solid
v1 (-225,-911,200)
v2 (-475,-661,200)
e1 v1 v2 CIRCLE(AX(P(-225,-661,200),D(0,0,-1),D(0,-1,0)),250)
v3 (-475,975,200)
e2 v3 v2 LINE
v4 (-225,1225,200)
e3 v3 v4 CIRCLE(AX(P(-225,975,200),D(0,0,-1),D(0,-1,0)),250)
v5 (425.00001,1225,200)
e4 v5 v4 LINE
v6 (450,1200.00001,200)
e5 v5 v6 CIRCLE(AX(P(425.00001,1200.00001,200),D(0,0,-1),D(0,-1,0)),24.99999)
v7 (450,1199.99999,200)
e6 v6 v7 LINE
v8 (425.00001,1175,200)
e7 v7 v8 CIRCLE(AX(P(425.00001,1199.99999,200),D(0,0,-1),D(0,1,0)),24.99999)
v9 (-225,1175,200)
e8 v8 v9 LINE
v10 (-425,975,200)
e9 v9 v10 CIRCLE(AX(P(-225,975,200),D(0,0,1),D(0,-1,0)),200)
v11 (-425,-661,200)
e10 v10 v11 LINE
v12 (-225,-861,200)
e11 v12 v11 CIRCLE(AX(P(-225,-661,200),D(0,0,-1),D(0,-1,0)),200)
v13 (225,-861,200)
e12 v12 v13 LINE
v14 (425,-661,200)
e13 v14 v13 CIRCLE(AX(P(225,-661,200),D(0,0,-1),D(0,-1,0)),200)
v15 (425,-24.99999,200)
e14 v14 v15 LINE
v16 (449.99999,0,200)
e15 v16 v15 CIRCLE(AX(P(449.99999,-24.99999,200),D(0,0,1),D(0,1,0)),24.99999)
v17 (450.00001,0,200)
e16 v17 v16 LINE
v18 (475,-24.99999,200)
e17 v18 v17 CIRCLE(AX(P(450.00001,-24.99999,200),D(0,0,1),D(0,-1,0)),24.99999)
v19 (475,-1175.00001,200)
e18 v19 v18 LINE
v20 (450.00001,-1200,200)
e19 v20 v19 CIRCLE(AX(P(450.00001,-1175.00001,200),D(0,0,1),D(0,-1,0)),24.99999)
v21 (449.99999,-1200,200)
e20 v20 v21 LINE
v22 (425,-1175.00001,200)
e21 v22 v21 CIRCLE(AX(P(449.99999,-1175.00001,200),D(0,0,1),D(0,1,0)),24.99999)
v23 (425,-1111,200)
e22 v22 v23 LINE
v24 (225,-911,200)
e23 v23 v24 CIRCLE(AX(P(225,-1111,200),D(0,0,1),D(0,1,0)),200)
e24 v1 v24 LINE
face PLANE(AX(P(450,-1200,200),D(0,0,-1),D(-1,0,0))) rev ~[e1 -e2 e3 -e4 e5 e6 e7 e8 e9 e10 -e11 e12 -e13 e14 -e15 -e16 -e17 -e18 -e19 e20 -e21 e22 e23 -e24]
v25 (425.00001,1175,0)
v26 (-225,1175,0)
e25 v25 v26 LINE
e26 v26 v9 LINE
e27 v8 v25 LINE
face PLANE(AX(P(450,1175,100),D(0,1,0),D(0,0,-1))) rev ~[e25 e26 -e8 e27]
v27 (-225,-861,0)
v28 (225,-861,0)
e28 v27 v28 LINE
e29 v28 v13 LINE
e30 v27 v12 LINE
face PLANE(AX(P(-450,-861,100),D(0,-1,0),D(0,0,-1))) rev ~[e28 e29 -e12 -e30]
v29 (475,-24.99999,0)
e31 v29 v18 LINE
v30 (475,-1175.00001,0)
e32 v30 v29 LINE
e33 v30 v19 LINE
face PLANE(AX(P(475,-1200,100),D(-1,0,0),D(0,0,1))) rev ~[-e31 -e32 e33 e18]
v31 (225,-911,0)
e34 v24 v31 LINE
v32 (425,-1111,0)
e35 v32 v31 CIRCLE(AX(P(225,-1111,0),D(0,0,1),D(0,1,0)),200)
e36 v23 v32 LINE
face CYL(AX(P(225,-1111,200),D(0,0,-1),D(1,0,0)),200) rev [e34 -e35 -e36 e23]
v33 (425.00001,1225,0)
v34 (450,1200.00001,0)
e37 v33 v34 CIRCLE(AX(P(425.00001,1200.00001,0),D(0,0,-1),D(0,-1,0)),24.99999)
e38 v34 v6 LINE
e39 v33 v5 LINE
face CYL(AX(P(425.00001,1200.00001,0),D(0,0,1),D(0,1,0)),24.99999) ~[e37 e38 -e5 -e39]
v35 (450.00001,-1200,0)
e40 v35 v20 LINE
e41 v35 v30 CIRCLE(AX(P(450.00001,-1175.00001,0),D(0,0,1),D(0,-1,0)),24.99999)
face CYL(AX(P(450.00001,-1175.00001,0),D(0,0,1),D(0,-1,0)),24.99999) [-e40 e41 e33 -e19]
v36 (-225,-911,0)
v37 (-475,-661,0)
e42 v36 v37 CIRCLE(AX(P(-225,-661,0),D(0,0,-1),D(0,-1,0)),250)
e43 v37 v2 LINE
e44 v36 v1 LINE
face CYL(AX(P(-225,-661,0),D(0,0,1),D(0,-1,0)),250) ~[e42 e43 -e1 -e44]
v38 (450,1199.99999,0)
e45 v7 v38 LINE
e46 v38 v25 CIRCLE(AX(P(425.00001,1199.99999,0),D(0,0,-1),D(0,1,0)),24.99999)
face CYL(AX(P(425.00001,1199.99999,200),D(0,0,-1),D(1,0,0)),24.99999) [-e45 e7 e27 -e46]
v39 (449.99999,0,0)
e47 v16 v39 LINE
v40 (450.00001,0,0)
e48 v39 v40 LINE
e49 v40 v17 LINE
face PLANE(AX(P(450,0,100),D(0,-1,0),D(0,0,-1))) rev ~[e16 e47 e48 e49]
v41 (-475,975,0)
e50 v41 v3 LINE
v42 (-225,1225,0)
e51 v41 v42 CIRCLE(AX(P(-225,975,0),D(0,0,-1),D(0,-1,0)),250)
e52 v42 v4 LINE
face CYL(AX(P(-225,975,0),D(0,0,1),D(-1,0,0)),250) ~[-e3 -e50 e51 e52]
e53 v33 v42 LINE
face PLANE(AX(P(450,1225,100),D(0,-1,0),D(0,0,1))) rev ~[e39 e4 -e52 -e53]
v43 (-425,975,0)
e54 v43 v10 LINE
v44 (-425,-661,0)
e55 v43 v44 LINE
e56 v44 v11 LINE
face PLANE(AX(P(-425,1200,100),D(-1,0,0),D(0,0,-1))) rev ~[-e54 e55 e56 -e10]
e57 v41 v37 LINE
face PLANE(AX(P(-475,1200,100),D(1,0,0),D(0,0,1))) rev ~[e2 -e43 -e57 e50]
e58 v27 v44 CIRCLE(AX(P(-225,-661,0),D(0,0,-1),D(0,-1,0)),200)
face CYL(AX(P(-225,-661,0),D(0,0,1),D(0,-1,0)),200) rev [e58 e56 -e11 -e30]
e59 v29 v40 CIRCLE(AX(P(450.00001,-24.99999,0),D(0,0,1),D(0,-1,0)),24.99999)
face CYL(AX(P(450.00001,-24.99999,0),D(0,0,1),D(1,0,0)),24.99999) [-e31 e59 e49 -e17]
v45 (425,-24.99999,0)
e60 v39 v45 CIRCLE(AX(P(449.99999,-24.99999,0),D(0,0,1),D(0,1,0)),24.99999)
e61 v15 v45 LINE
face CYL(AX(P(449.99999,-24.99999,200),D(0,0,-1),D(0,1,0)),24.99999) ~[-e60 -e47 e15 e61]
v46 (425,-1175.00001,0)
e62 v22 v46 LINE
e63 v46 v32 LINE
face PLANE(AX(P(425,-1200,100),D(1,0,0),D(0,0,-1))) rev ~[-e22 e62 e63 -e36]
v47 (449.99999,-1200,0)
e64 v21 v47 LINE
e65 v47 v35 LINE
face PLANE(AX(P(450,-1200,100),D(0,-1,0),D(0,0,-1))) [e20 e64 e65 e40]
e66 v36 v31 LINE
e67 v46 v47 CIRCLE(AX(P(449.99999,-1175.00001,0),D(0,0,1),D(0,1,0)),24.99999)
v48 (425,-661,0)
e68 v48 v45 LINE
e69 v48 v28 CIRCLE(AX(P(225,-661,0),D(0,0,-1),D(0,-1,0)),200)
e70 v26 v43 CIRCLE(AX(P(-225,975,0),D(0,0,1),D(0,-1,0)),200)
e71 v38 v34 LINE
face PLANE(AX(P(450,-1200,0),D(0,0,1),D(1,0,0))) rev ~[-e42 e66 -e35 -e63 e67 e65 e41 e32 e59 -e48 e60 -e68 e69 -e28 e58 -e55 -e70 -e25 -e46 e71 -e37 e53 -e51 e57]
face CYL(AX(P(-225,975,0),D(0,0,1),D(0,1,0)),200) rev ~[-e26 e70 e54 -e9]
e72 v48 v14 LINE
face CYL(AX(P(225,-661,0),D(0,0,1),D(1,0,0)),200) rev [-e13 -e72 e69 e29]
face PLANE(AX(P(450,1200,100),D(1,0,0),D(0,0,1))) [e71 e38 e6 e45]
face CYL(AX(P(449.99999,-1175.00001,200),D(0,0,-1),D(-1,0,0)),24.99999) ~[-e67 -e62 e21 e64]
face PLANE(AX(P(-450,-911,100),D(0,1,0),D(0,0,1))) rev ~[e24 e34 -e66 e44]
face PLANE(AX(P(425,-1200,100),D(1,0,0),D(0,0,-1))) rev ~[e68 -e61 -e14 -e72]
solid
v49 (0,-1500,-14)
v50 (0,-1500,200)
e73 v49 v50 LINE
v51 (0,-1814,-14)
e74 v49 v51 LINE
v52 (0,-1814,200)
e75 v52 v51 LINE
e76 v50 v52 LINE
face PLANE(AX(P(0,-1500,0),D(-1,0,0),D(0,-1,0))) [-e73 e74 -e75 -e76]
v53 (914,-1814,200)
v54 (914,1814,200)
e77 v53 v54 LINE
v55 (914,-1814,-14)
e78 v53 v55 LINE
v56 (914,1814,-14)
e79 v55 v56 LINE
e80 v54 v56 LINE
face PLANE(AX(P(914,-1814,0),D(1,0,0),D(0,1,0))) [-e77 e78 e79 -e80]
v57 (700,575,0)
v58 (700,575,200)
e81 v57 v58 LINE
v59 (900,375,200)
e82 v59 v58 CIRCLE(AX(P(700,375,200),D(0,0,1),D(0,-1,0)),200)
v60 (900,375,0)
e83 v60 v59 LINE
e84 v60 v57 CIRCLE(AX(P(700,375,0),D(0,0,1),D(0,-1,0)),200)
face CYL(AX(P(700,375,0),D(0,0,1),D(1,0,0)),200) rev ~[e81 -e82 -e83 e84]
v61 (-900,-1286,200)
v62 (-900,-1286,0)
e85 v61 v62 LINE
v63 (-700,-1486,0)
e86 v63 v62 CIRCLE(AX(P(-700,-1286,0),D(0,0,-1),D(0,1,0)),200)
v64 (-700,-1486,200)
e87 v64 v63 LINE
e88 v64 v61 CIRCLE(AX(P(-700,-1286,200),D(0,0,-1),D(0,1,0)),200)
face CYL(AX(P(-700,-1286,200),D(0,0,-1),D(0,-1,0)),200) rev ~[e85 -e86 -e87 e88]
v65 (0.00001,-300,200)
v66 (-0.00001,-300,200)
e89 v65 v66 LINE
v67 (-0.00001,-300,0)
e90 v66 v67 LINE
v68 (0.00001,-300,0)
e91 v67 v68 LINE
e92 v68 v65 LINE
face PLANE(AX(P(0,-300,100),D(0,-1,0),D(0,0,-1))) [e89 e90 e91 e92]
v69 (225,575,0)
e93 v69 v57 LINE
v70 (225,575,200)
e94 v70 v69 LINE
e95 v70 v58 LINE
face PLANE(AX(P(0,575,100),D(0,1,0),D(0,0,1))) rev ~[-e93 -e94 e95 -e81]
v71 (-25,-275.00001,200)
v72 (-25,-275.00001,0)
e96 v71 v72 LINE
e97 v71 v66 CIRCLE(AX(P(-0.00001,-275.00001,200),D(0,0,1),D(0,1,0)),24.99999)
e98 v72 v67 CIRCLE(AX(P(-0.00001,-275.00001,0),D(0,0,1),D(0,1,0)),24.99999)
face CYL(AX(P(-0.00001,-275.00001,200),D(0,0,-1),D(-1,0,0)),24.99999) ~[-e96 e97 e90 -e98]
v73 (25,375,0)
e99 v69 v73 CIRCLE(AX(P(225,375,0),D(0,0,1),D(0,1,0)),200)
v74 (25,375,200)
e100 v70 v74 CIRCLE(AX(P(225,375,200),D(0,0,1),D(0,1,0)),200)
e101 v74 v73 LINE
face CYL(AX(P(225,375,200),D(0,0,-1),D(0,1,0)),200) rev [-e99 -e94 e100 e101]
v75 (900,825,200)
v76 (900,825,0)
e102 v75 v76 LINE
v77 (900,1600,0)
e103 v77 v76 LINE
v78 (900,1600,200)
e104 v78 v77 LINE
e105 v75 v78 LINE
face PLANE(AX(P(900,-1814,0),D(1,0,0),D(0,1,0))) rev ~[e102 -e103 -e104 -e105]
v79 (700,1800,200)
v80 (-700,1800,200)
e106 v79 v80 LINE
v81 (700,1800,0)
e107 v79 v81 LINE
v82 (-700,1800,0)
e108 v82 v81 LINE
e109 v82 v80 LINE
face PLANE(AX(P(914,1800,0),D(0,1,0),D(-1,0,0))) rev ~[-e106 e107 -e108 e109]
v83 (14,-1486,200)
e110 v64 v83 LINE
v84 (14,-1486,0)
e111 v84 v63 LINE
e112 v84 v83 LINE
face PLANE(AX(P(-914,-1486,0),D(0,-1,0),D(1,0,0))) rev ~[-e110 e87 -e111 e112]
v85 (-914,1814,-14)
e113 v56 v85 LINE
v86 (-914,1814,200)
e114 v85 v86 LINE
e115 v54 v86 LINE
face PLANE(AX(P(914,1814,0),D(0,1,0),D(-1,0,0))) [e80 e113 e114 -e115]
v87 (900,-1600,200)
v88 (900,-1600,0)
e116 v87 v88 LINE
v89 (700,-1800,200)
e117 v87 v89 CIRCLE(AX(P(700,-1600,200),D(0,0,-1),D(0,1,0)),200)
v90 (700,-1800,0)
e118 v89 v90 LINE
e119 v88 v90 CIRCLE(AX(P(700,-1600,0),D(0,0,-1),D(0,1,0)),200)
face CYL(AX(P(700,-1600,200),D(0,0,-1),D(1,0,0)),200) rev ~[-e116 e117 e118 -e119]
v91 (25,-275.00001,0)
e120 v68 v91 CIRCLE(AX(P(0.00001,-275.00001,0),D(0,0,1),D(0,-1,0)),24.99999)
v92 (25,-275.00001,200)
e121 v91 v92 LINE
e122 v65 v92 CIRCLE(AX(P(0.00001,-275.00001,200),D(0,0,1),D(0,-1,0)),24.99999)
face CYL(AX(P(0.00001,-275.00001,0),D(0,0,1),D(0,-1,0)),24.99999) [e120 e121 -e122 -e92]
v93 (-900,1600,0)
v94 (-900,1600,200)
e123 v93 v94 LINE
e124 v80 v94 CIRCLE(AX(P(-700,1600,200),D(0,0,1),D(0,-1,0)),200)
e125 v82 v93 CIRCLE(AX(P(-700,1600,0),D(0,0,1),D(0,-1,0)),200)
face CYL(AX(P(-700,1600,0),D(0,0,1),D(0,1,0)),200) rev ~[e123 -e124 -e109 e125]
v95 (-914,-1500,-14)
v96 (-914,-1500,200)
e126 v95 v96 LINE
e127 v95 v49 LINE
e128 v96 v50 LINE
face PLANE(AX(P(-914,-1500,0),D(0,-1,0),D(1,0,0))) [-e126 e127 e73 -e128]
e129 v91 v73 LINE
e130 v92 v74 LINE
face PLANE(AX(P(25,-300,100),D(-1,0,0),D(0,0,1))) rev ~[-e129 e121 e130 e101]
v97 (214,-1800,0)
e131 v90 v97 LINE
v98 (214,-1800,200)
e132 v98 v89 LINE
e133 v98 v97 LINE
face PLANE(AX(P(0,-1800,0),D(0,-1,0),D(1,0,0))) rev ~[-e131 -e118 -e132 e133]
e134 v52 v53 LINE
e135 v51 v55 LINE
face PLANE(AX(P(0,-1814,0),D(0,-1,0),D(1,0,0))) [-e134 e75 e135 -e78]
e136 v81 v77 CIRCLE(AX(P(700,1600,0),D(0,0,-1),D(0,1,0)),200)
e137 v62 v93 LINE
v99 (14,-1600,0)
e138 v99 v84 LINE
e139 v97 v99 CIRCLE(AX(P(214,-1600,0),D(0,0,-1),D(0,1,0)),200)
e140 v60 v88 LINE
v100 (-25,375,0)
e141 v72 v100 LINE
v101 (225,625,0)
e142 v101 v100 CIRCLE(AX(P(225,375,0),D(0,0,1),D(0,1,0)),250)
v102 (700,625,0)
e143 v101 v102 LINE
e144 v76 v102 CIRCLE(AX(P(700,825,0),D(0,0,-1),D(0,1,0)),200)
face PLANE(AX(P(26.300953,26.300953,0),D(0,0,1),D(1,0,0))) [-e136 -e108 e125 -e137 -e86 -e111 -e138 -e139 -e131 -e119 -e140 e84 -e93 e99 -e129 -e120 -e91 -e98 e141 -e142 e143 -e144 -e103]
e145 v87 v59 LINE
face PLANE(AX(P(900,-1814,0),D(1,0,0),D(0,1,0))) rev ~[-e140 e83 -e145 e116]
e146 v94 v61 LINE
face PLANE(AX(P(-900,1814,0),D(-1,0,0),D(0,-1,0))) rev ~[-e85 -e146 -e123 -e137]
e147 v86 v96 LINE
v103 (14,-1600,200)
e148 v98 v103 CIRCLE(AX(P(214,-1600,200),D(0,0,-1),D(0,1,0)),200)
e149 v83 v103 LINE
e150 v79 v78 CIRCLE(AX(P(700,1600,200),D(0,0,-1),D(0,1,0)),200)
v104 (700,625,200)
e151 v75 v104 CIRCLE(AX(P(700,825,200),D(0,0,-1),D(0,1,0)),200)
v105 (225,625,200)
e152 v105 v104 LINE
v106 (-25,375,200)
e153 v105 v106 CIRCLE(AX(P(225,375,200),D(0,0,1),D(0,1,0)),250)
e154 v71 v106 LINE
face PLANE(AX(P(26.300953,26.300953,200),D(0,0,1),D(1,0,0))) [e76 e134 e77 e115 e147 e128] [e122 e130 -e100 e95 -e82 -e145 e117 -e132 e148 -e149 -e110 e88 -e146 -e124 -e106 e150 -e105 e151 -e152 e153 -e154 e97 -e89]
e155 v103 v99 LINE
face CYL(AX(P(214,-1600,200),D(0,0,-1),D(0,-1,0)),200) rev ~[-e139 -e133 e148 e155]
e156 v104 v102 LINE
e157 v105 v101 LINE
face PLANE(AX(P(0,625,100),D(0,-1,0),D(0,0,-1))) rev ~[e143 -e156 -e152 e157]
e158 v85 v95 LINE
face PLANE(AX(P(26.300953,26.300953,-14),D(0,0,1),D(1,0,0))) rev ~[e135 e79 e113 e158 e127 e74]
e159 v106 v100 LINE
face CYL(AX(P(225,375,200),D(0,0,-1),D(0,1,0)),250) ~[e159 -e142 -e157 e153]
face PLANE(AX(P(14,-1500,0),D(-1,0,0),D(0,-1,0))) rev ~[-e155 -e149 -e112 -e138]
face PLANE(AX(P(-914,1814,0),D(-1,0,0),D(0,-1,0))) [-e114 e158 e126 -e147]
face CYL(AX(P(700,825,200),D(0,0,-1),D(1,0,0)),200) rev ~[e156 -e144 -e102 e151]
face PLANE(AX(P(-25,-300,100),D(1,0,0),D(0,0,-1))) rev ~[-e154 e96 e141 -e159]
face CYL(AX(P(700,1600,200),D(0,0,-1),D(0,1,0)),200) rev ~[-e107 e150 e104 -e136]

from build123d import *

# Parameters (mm, degrees)
F6_DEPTH      = 200
F6_DEPTH_BACK = 14
F7_T          = -14
F12_W         = 50
F12_H         = 200
F13_W         = 50
F13_H         = 200
F14_W         = 50
F14_H         = 200
F19_R         = 200
F19_2_R       = 200
F20_R         = 250
F20_2_R       = 250
F21_R         = 24.99999
F21_2_R       = 24.99999


# Not quite as in the source:
# - a fillet or chamfer is up to 0.001 mm smaller than in the source, because OpenCascade refuses the exact size


with BuildPart() as f6:
    # F5 (on Top) → F6 (new body, two sides)
    with BuildSketch(Plane.XY) as f6_sk:
        Polygon((914, 1814), (-914, 1814), (-914, -1500), (0, -1500), (0, -1814), (914, -1814), align=None)
    extrude(amount=F6_DEPTH)
    extrude(f6_sk.sketch, amount=-F6_DEPTH_BACK)

    # F7
    f7_openings = [f6.faces().sort_by_distance(p)[0] for p in [
        (20.670988, 74.949294, 200),
    ]]
    offset(amount=F7_T, openings=f7_openings, kind=Kind.INTERSECTION)

    # F17: sweep along a path in F8
    with BuildLine(Plane.XY) as f17_path:
        Line((0, -300), (0, 600))
        Line((0, 600), (900, 600))
    # F14 (on plane+point) → F17 (sweep)
    with BuildSketch(Plane.XZ.offset(300)):
        with Locations((0, 100)):
            Rectangle(F14_W, F14_H)
    sweep(path=f17_path.line, transition=Transition.RIGHT)

    # F19
    f19_edges = [f6.edges().sort_by_distance(p)[0] for p in [
        (25, 575, 100),
        (900, 575, 100),
        (900, 625, 100),
        (14, -1800, 100),
        (900, -1800, 100),
        (-900, -1486, 100),
        (-900, 1800, 100),
        (900, 1800, 100),
    ]]
    fillet(f19_edges, radius=F19_R)

    # F20
    f20_edges = [f6.edges().sort_by_distance(p)[0] for p in [
        (-25, 625, 100),
    ]]
    fillet(f20_edges, radius=F20_R)

    # F21 (radius 25 in the source; OpenCascade refuses exactly that, so slightly less here)
    f21_edges = [f6.edges().sort_by_distance(p)[0] for p in [
        (25, -300, 100),
        (-25, -300, 100),
    ]]
    fillet(f21_edges, radius=F21_R)


with BuildPart() as f15:
    # F15: sweep along a path in F8
    with BuildLine(Plane.XY) as f15_path:
        Line((450, 1200), (-450, 1200))
        Line((-450, 1200), (-450, -886))
        Line((-450, -886), (450, -886))
    # F12 (on plane+point) → F15 (sweep)
    with BuildSketch(Plane.YZ.offset(450)):
        with Locations((1200, 100)):
            Rectangle(F12_W, F12_H)
    sweep(path=f15_path.line, transition=Transition.RIGHT)

    # F16: sweep along a path in F8
    with BuildLine(Plane.XY) as f16_path:
        Line((450, -1200), (450, 0))
    # F13 (on plane+point) → F16 (sweep)
    with BuildSketch(Plane.XZ.offset(1200)):
        with Locations((450, 100)):
            Rectangle(F13_W, F13_H)
    sweep(path=f16_path.line)

    # F18: union 

    # F19#2
    f19_2_edges = [f15.edges().sort_by_distance(p)[0] for p in [
        (425, -861, 100),
        (-425, -861, 100),
        (-425, 1175, 100),
        (425, -911, 100),
    ]]
    fillet(f19_2_edges, radius=F19_2_R)

    # F20#2
    f20_2_edges = [f15.edges().sort_by_distance(p)[0] for p in [
        (-475, 1225, 100),
        (-475, -911, 100),
    ]]
    fillet(f20_2_edges, radius=F20_2_R)

    # F21#2 (radius 25 in the source; OpenCascade refuses exactly that, so slightly less here)
    f21_2_edges = [f15.edges().sort_by_distance(p)[0] for p in [
        (450, 1225, 100),
        (450, 1175, 100),
        (425, 0, 100),
        (475, 0, 100),
        (425, -1200, 100),
        (475, -1200, 100),
    ]]
    fillet(f21_2_edges, radius=F21_2_R)


solid = Compound([f6.part, f15.part])
